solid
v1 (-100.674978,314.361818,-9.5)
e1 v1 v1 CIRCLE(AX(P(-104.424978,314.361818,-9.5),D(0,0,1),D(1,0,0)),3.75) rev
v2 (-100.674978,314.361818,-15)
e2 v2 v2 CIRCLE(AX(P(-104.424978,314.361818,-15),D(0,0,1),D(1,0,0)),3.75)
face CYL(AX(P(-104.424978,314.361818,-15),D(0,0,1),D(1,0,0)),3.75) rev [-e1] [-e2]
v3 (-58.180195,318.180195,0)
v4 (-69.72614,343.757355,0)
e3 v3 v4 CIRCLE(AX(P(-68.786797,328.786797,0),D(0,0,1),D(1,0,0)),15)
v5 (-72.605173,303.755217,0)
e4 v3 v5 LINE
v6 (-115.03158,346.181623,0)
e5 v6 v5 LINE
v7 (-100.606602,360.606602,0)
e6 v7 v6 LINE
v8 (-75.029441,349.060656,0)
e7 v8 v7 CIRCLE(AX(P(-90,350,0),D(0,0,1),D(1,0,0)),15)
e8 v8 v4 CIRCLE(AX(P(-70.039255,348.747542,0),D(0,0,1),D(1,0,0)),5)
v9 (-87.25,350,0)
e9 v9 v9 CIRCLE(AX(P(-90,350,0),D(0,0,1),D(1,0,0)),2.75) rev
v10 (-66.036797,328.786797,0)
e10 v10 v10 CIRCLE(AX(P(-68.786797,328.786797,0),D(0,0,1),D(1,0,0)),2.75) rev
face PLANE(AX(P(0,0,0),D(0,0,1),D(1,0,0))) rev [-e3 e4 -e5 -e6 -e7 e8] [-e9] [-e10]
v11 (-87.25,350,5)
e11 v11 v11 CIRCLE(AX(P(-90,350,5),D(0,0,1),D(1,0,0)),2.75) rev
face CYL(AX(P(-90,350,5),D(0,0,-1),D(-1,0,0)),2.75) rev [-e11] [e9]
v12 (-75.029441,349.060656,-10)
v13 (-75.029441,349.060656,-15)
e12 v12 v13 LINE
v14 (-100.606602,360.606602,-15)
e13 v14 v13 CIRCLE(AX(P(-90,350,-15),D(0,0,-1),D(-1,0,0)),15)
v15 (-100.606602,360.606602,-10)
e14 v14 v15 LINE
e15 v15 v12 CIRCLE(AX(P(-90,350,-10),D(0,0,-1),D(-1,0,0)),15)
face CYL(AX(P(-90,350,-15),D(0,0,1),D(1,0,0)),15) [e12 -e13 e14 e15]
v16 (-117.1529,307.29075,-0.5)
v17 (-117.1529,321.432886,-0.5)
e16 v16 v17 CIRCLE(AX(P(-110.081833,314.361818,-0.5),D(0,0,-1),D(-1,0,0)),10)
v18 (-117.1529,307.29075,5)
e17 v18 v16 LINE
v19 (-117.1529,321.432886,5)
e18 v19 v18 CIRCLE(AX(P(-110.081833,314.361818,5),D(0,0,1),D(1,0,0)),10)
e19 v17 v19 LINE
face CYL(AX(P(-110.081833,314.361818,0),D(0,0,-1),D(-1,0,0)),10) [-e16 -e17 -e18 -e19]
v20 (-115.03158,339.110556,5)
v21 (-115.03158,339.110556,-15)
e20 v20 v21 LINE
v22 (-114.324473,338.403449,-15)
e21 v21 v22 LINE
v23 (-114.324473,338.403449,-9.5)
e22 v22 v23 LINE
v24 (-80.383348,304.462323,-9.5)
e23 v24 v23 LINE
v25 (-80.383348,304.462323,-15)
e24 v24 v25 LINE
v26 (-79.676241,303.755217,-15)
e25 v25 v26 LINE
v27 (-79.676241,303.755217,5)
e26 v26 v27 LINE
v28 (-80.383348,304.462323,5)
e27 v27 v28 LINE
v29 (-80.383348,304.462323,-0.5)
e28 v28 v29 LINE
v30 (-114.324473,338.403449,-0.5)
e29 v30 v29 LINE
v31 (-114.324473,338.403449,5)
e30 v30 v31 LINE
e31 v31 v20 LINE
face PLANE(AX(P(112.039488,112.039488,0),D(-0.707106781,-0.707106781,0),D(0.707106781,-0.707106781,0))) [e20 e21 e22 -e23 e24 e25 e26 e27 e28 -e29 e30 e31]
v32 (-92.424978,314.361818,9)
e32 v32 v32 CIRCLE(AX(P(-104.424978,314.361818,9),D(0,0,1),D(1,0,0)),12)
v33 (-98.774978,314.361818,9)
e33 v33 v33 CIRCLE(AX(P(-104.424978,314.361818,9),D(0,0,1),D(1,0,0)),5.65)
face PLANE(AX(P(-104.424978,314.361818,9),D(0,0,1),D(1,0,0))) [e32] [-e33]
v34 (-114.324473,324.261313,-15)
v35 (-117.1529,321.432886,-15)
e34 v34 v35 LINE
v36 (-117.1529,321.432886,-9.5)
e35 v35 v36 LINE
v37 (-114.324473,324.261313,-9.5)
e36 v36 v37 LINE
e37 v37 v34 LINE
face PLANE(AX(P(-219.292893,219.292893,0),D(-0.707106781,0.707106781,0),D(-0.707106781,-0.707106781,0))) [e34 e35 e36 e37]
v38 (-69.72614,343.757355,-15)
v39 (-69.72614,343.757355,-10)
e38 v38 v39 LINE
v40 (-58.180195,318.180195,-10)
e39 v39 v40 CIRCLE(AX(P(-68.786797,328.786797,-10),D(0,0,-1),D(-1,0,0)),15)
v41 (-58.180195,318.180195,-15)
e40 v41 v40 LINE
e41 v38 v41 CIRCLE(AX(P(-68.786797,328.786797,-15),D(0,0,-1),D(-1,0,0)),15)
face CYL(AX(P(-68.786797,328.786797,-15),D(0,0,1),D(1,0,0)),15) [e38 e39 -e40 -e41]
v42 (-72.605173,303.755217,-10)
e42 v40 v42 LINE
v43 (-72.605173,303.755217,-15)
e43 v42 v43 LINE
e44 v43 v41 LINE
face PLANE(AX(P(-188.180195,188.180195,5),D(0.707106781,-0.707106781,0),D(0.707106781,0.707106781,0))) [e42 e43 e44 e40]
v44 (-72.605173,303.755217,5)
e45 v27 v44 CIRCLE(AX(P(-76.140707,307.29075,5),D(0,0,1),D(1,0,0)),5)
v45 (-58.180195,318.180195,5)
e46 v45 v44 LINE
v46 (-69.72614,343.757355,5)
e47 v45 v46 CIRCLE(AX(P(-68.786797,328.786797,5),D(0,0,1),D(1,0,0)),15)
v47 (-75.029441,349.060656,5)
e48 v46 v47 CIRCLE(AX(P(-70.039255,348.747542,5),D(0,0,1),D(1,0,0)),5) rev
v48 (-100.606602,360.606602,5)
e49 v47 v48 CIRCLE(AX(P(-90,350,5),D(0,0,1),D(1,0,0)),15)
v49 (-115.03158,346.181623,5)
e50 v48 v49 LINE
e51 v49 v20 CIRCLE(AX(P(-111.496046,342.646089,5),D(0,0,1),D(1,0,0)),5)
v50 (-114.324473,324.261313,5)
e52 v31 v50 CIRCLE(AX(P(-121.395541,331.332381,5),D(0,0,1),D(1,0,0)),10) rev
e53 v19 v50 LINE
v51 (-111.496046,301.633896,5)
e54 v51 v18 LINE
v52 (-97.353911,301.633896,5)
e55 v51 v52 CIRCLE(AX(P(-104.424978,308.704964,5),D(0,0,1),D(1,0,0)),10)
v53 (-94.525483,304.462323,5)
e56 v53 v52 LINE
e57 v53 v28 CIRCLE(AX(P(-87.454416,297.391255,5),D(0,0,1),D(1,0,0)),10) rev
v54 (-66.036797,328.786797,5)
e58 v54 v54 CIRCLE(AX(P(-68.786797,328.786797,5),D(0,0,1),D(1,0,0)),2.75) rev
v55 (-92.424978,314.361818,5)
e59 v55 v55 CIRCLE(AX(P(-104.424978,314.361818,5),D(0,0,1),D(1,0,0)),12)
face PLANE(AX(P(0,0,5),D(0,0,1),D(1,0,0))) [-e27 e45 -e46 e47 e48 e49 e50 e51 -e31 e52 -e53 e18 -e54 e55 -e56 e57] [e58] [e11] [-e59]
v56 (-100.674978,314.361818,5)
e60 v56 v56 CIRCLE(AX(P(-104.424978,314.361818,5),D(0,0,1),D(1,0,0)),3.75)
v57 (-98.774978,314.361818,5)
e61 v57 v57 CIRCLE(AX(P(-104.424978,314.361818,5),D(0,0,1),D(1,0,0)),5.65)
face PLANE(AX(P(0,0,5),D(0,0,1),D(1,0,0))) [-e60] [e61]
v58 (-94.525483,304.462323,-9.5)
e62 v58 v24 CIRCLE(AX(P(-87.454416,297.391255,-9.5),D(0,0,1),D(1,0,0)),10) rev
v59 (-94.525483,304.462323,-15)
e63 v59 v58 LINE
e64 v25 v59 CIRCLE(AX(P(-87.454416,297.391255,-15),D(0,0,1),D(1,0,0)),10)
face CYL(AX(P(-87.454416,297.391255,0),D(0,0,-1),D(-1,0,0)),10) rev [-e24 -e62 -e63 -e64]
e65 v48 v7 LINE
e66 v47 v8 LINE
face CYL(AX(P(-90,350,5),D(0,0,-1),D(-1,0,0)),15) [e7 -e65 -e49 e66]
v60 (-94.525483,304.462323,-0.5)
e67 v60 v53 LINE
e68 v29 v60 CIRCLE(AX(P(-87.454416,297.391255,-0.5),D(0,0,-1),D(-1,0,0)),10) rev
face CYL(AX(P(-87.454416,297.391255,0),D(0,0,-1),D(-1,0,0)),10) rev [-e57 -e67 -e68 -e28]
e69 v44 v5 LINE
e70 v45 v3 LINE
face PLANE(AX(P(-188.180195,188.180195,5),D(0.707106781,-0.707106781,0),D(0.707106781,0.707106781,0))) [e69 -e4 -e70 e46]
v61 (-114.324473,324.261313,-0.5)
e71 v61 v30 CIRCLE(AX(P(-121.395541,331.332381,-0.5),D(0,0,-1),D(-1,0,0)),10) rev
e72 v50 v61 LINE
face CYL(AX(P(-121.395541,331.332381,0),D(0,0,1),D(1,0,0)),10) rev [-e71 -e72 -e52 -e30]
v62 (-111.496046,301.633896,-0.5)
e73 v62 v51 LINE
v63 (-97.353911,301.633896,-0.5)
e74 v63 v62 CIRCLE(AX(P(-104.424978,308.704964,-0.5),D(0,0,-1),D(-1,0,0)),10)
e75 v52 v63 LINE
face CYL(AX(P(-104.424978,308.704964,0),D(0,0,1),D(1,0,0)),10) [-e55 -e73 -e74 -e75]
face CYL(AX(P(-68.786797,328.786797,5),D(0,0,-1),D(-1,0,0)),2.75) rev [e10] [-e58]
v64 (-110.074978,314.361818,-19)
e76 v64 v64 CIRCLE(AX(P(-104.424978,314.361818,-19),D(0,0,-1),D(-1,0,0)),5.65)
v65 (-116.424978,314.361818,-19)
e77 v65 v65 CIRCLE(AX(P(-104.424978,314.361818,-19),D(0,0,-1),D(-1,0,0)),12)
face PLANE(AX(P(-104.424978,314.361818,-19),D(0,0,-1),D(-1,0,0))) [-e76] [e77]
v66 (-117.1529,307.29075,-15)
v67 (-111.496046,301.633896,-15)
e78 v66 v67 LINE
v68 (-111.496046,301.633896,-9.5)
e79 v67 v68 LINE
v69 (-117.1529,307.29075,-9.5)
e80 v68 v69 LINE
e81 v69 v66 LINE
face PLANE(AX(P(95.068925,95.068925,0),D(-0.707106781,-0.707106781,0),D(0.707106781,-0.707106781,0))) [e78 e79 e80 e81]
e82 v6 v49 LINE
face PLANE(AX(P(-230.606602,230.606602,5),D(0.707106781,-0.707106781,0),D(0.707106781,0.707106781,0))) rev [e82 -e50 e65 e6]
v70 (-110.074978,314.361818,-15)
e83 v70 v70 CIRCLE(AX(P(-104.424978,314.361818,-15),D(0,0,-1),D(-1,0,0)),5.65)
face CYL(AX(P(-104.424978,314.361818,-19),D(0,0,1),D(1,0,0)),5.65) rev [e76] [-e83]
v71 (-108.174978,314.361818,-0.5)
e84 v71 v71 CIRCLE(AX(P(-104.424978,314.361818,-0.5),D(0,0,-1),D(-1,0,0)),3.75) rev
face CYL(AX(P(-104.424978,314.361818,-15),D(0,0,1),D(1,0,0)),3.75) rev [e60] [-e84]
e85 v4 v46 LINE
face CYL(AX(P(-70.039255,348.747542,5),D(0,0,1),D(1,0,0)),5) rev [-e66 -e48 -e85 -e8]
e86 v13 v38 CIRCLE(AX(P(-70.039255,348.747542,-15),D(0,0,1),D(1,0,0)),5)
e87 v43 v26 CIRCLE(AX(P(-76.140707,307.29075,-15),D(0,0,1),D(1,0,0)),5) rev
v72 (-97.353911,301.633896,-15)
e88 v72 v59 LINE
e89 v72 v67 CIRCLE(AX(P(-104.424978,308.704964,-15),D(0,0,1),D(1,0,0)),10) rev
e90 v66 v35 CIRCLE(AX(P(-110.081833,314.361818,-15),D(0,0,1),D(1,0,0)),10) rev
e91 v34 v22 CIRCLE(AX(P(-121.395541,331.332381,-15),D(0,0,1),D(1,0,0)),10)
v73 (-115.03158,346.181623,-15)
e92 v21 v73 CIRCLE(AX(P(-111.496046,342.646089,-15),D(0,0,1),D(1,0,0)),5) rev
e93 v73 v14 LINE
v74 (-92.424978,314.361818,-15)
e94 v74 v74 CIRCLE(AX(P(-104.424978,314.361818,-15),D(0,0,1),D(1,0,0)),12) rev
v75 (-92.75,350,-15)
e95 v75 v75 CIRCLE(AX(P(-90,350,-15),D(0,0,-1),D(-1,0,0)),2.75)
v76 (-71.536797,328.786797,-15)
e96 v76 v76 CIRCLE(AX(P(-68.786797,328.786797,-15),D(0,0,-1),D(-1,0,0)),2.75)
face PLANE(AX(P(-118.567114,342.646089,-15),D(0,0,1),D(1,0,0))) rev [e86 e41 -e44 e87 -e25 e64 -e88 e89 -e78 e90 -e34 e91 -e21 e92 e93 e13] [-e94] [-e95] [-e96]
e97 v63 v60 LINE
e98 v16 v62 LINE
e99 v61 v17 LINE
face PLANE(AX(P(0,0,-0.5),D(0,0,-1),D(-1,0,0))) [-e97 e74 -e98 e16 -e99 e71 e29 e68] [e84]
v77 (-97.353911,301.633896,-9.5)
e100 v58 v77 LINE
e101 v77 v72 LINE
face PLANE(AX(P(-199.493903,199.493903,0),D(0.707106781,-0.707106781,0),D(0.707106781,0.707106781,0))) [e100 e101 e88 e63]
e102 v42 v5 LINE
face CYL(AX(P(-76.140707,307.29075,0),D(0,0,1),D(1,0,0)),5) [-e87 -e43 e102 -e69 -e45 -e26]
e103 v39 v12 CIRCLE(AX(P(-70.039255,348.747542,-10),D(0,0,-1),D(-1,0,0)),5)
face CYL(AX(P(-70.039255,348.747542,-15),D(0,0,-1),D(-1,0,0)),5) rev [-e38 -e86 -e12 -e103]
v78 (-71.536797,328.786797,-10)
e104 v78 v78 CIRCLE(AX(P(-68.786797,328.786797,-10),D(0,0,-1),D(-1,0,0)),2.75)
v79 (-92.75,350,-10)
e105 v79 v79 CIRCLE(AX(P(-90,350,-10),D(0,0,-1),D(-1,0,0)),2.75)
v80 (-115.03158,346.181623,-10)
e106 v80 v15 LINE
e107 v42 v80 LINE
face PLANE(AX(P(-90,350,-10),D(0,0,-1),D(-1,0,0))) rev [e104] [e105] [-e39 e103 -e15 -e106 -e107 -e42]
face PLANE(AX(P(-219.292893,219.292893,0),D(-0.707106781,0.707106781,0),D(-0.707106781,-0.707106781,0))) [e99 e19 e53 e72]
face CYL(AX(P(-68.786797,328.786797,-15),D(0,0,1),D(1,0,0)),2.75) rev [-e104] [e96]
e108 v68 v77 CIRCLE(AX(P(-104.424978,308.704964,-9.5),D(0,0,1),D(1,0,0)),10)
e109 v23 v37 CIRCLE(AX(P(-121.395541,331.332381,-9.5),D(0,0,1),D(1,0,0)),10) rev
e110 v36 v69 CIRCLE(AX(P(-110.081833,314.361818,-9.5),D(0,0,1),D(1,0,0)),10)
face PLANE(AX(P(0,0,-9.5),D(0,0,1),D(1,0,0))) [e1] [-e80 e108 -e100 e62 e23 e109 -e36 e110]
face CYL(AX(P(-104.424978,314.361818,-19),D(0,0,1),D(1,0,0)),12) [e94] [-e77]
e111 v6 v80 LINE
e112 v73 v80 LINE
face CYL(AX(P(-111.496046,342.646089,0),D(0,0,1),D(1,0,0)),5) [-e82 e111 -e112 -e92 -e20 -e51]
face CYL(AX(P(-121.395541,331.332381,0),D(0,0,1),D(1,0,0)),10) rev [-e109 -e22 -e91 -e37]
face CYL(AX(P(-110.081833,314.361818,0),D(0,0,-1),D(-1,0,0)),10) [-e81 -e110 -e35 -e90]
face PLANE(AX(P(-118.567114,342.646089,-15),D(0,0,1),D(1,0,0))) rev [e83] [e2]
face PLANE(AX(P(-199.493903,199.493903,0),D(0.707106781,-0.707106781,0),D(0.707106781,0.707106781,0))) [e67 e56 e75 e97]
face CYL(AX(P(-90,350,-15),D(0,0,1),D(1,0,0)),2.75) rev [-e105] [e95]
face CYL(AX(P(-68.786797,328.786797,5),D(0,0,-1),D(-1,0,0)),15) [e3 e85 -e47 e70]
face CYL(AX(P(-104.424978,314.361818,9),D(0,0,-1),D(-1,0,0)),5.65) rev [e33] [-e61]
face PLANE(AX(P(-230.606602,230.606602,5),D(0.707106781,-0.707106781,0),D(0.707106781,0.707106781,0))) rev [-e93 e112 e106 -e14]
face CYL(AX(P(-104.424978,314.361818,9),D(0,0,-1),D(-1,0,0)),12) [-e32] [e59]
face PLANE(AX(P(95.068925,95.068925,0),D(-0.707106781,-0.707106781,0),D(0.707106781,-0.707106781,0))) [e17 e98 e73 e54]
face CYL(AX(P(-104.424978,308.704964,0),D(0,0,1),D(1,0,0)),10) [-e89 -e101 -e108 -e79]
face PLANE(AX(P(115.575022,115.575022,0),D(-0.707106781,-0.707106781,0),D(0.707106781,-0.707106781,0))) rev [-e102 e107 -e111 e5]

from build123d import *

# Parameters (mm, degrees)
SKETCH2_R               = 2.75
BOSS_EXTRUDE2_DEPTH     = 5
SKETCH3_R               = 2.75
BOSS_EXTRUDE3_DEPTH     = 5
SKETCH4_W               = 20
SKETCH4_H               = 60
BOSS_EXTRUDE4_DEPTH     = 5
FILLET1_R               = 5
SKETCH5_W               = 8
SKETCH5_H               = 10
BOSS_EXTRUDE5_DEPTH     = 20
FILLET3_START           = -16
FILLET3_DEPTH           = 22
CUT_EXTRUDE1_DEPTH      = 385.295668221
CUT_EXTRUDE1_DEPTH_BACK = 385.295668221
SKETCH8_R               = 9
SKETCH8_R_2             = 5.65
BOSS_EXTRUDE6_DEPTH     = 4
BOSS_EXTRUDE7_START     = 4
SKETCH9_R               = 9
SKETCH9_R_2             = 5.65
BOSS_EXTRUDE7_DEPTH     = 4
CUT_EXTRUDE2_DEPTH      = 2.5
CUT_EXTRUDE3_DEPTH      = 2.5
SKETCH12_W              = 5.5
SKETCH12_H              = 20
BOSS_EXTRUDE8_DEPTH     = 4
SKETCH13_W              = 5.5
SKETCH13_H              = 20
BOSS_EXTRUDE9_DEPTH     = 4
SKETCH14_W              = 5.5
SKETCH14_H              = 28
BOSS_EXTRUDE10_DEPTH    = 4
FILLET4_R               = 10
SKETCH16_R              = 12
SKETCH16_R_2            = 5.65
BOSS_EXTRUDE11_DEPTH    = 4
BOSS_EXTRUDE12_START    = 4
SKETCH17_R              = 12
SKETCH17_R_2            = 5.65
BOSS_EXTRUDE12_DEPTH    = 4


with BuildPart() as part:
    # Sketch2 → Boss-Extrude2 (new body)
    with BuildSketch(Plane.XY):
        with BuildLine():
            ThreePointArc((-79.393398282, 339.393398282), (-79.393398282, 360.606601718), (-100.606601718, 360.606601718))
            Line((-100.606601718, 360.606601718), (-115.031580054, 346.181623382))
            Line((-115.031580054, 346.181623382), (-72.605173183, 303.75521651))
            Line((-72.605173183, 303.75521651), (-58.180194847, 318.180194847))
            ThreePointArc((-58.180194847, 318.180194847), (-58.180194847, 339.393398282), (-79.393398282, 339.393398282))
        make_face()
        with Locations((-90, 350)):
            Circle(SKETCH2_R, mode=Mode.SUBTRACT)
        with Locations((-68.786796564, 328.786796564)):
            Circle(SKETCH2_R, mode=Mode.SUBTRACT)
    extrude(amount=BOSS_EXTRUDE2_DEPTH)



with BuildPart() as body_2:
    # Sketch3 → Boss-Extrude3 (new body)
    with BuildSketch(Plane(origin=(0, 0, -10), x_dir=(-1, 0, 0), z_dir=(0, 0, -1))):
        with BuildLine():
            Line((72.605173183, 303.75521651), (115.031580054, 346.181623382))
            Line((115.031580054, 346.181623382), (100.606601718, 360.606601718))
            ThreePointArc((100.606601718, 360.606601718), (79.393398282, 360.606601718), (79.393398282, 339.393398282))
            ThreePointArc((79.393398282, 339.393398282), (58.180194847, 339.393398282), (58.180194847, 318.180194847))
            Line((58.180194847, 318.180194847), (72.605173183, 303.75521651))
        make_face()
        with Locations(Location((90, 350, 0), (0, 0, 180))):
            Circle(SKETCH3_R, mode=Mode.SUBTRACT)
        with Locations(Location((68.786796564, 328.786796564, 0), (0, 0, 180))):
            Circle(SKETCH3_R, mode=Mode.SUBTRACT)
    extrude(amount=BOSS_EXTRUDE3_DEPTH)


with BuildPart() as part_1:
    add(part.part)

    add(body_2.part)  # Boss-Extrude4 merges body 2
    # Sketch4 → Boss-Extrude4 (add)
    with BuildSketch(Plane(origin=(115.575021664, 115.575021664, 0), x_dir=(0, 0, 1), z_dir=(-0.7071067811865471, -0.707106781186548, 0))):
        with Locations((-5, 296.126983722)):
            Rectangle(SKETCH4_W, SKETCH4_H)
    extrude(amount=BOSS_EXTRUDE4_DEPTH)

    # Fillet1
    fillet1_edges = [part_1.edges().sort_by_distance(p)[0] for p in [
        (-79.393398282, 339.393398282, 2.5),
        (-79.393398282, 339.393398282, -12.5),
    ]]
    fillet(fillet1_edges, radius=FILLET1_R)

    # Sketch5 → Boss-Extrude5 (add)
    with BuildSketch(Plane(origin=(112.039487758, 112.039487758, 0), x_dir=(0, 0, 1), z_dir=(-0.7071067811865477, -0.7071067811865475, 0))):
        with Locations((1, 301.126983722)):
            Rectangle(SKETCH5_W, SKETCH5_H)
        with Locations((-11, 301.126983722)):
            Rectangle(SKETCH5_W, SKETCH5_H)
        with Locations((-11, 291.126983722)):
            Rectangle(SKETCH5_W, SKETCH5_H)
        with Locations((1, 291.126983722)):
            Rectangle(SKETCH5_W, SKETCH5_H)
    extrude(amount=BOSS_EXTRUDE5_DEPTH)

    # Fillet3: read off the stored shape, not the designer's step
    # Fillet3 outline → Fillet3 (cut)
    with BuildSketch(Plane.XY.offset(FILLET3_START)):
        with BuildLine():
            Line((-118.56711396, 342.646089476), (-115.031580054, 339.11055557))
            ThreePointArc((-115.031580054, 339.11055557), (-116.496046148, 342.646089476), (-115.031580054, 346.181623382))
            Line((-115.031580054, 346.181623382), (-118.56711396, 342.646089476))
        make_face()
        with BuildLine():
            ThreePointArc((-72.605173183, 303.75521651), (-76.140707089, 302.290750416), (-79.676240995, 303.75521651))
            Line((-79.676240995, 303.75521651), (-76.140707089, 300.219682604))
            Line((-76.140707089, 300.219682604), (-72.605173183, 303.75521651))
        make_face()
    extrude(amount=FILLET3_DEPTH, mode=Mode.SUBTRACT)

    # Sketch7 → Cut-Extrude1 (cut, two sides: drawn at the far end of the back side and taken through both)
    with BuildSketch(Plane.XY.offset(5).offset(-CUT_EXTRUDE1_DEPTH_BACK)):
        with BuildLine():
            ThreePointArc((-100.674978336, 314.361818228), (-102.989915465, 317.826366475), (-107.076628766, 317.013468658))
            Line((-107.076628766, 317.013468658), (-101.773327907, 311.710167799))
            ThreePointArc((-101.773327907, 311.710167799), (-100.960430089, 312.926755357), (-100.674978336, 314.361818228))
        make_face()
        with BuildLine():
            Line((-101.773327907, 311.710167799), (-107.076628766, 317.013468658))
            ThreePointArc((-107.076628766, 317.013468658), (-107.076628766, 311.710167799), (-101.773327907, 311.710167799))
        make_face()
    extrude(amount=CUT_EXTRUDE1_DEPTH + CUT_EXTRUDE1_DEPTH_BACK, mode=Mode.SUBTRACT)

    # Sketch8 → Boss-Extrude6 (add)
    with BuildSketch(Plane(origin=(0, 0, -15), x_dir=(-1, 0, 0), z_dir=(0, 0, -1))):
        with Locations((104.424978336, 314.361818228)):
            Circle(SKETCH8_R)
        with Locations((104.424978336, 314.361818228)):
            Circle(SKETCH8_R_2, mode=Mode.SUBTRACT)
    extrude(amount=BOSS_EXTRUDE6_DEPTH)

    # Sketch9 → Boss-Extrude7 (add)
    with BuildSketch(Plane.XY.offset(5).offset(BOSS_EXTRUDE7_START)):
        with Locations(Location((-104.424978336, 314.361818228, 0), (0, 0, 180))):
            Circle(SKETCH9_R)
        with Locations(Location((-104.424978336, 314.361818228, 0), (0, 0, 180))):
            Circle(SKETCH9_R_2, mode=Mode.SUBTRACT)
    extrude(amount=-BOSS_EXTRUDE7_DEPTH)

    # Sketch10 → Cut-Extrude2 (cut)
    with BuildSketch(Plane.XY.offset(-7)):
        Polygon((-118.56711396, 314.361818228), (-104.424978336, 300.219682604), (-90.282842712, 314.361818228), (-104.424978336, 328.503953852), align=None)
    extrude(amount=-CUT_EXTRUDE2_DEPTH, mode=Mode.SUBTRACT)

    # Sketch11 → Cut-Extrude3 (cut)
    with BuildSketch(Plane(origin=(0, 0, -3), x_dir=(-1, 0, 0), z_dir=(0, 0, -1))):
        Polygon((90.282842712, 314.361818228), (104.424978336, 300.219682604), (118.56711396, 314.361818228), (104.424978336, 328.503953852), align=None)
    extrude(amount=-CUT_EXTRUDE3_DEPTH, mode=Mode.SUBTRACT)

    # Sketch12 → Boss-Extrude8 (add)
    with BuildSketch(Plane(origin=(-216.464466094, 216.464466094, 0), x_dir=(0, 0, 1), z_dir=(-0.7071067811865476, 0.7071067811865476, 0))):
        with Locations((-12.25, 148.447763109)):
            Rectangle(SKETCH12_W, SKETCH12_H)
        with Locations((2.25, 148.447763109)):
            Rectangle(SKETCH12_W, SKETCH12_H)
    extrude(amount=BOSS_EXTRUDE8_DEPTH)

    # Sketch13 → Boss-Extrude9 (add)
    with BuildSketch(Plane(origin=(-202.32233047, 202.32233047, 0), x_dir=(0, 0, -1), z_dir=(0.7071067811865476, -0.7071067811865476, 0))):
        with Locations((12.25, 148.447763109)):
            Rectangle(SKETCH13_W, SKETCH13_H)
        with Locations((-2.25, 148.447763109)):
            Rectangle(SKETCH13_W, SKETCH13_H)
    extrude(amount=BOSS_EXTRUDE9_DEPTH)

    # Sketch14 → Boss-Extrude10 (add)
    with BuildSketch(Plane(origin=(97.897352134, 97.897352134, 0), x_dir=(0, 0, 1), z_dir=(-0.7071067811865476, -0.7071067811865476, 0))):
        with Locations((2.25, 296.126983722)):
            Rectangle(SKETCH14_W, SKETCH14_H)
        with Locations((-12.25, 296.126983722)):
            Rectangle(SKETCH14_W, SKETCH14_H)
    extrude(amount=BOSS_EXTRUDE10_DEPTH)

    # Fillet4
    fillet4_edges = [part_1.edges().sort_by_distance(p)[0] for p in [
        (-107.253405461, 331.332380977, -12.25),
        (-107.253405461, 331.332380977, 2.25),
        (-87.454415588, 311.533391103, -12.25),
        (-87.454415588, 311.533391103, 2.25),
        (-104.424978336, 294.562828355, 2.25),
        (-124.223968209, 314.361818228, 2.25),
        (-124.223968209, 314.361818228, -12.25),
        (-104.424978336, 294.562828355, -12.25),
    ]]
    fillet(fillet4_edges, radius=FILLET4_R)

    # Sketch16 → Boss-Extrude11 (add)
    with BuildSketch(Plane(origin=(0, 0, -15), x_dir=(-1, 0, 0), z_dir=(0, 0, -1))):
        with Locations(Location((104.424978336, 314.361818228, 0), (0, 0, 180))):
            Circle(SKETCH16_R)
        with Locations((104.424978336, 314.361818228)):
            Circle(SKETCH16_R_2, mode=Mode.SUBTRACT)
    extrude(amount=BOSS_EXTRUDE11_DEPTH)

    # Sketch17 → Boss-Extrude12 (add)
    with BuildSketch(Plane.XY.offset(5).offset(BOSS_EXTRUDE12_START)):
        with Locations((-104.424978336, 314.361818228)):
            Circle(SKETCH17_R)
        with Locations(Location((-104.424978336, 314.361818228, 0), (0, 0, 180))):
            Circle(SKETCH17_R_2, mode=Mode.SUBTRACT)
    extrude(amount=-BOSS_EXTRUDE12_DEPTH)


solid = part_1.part
